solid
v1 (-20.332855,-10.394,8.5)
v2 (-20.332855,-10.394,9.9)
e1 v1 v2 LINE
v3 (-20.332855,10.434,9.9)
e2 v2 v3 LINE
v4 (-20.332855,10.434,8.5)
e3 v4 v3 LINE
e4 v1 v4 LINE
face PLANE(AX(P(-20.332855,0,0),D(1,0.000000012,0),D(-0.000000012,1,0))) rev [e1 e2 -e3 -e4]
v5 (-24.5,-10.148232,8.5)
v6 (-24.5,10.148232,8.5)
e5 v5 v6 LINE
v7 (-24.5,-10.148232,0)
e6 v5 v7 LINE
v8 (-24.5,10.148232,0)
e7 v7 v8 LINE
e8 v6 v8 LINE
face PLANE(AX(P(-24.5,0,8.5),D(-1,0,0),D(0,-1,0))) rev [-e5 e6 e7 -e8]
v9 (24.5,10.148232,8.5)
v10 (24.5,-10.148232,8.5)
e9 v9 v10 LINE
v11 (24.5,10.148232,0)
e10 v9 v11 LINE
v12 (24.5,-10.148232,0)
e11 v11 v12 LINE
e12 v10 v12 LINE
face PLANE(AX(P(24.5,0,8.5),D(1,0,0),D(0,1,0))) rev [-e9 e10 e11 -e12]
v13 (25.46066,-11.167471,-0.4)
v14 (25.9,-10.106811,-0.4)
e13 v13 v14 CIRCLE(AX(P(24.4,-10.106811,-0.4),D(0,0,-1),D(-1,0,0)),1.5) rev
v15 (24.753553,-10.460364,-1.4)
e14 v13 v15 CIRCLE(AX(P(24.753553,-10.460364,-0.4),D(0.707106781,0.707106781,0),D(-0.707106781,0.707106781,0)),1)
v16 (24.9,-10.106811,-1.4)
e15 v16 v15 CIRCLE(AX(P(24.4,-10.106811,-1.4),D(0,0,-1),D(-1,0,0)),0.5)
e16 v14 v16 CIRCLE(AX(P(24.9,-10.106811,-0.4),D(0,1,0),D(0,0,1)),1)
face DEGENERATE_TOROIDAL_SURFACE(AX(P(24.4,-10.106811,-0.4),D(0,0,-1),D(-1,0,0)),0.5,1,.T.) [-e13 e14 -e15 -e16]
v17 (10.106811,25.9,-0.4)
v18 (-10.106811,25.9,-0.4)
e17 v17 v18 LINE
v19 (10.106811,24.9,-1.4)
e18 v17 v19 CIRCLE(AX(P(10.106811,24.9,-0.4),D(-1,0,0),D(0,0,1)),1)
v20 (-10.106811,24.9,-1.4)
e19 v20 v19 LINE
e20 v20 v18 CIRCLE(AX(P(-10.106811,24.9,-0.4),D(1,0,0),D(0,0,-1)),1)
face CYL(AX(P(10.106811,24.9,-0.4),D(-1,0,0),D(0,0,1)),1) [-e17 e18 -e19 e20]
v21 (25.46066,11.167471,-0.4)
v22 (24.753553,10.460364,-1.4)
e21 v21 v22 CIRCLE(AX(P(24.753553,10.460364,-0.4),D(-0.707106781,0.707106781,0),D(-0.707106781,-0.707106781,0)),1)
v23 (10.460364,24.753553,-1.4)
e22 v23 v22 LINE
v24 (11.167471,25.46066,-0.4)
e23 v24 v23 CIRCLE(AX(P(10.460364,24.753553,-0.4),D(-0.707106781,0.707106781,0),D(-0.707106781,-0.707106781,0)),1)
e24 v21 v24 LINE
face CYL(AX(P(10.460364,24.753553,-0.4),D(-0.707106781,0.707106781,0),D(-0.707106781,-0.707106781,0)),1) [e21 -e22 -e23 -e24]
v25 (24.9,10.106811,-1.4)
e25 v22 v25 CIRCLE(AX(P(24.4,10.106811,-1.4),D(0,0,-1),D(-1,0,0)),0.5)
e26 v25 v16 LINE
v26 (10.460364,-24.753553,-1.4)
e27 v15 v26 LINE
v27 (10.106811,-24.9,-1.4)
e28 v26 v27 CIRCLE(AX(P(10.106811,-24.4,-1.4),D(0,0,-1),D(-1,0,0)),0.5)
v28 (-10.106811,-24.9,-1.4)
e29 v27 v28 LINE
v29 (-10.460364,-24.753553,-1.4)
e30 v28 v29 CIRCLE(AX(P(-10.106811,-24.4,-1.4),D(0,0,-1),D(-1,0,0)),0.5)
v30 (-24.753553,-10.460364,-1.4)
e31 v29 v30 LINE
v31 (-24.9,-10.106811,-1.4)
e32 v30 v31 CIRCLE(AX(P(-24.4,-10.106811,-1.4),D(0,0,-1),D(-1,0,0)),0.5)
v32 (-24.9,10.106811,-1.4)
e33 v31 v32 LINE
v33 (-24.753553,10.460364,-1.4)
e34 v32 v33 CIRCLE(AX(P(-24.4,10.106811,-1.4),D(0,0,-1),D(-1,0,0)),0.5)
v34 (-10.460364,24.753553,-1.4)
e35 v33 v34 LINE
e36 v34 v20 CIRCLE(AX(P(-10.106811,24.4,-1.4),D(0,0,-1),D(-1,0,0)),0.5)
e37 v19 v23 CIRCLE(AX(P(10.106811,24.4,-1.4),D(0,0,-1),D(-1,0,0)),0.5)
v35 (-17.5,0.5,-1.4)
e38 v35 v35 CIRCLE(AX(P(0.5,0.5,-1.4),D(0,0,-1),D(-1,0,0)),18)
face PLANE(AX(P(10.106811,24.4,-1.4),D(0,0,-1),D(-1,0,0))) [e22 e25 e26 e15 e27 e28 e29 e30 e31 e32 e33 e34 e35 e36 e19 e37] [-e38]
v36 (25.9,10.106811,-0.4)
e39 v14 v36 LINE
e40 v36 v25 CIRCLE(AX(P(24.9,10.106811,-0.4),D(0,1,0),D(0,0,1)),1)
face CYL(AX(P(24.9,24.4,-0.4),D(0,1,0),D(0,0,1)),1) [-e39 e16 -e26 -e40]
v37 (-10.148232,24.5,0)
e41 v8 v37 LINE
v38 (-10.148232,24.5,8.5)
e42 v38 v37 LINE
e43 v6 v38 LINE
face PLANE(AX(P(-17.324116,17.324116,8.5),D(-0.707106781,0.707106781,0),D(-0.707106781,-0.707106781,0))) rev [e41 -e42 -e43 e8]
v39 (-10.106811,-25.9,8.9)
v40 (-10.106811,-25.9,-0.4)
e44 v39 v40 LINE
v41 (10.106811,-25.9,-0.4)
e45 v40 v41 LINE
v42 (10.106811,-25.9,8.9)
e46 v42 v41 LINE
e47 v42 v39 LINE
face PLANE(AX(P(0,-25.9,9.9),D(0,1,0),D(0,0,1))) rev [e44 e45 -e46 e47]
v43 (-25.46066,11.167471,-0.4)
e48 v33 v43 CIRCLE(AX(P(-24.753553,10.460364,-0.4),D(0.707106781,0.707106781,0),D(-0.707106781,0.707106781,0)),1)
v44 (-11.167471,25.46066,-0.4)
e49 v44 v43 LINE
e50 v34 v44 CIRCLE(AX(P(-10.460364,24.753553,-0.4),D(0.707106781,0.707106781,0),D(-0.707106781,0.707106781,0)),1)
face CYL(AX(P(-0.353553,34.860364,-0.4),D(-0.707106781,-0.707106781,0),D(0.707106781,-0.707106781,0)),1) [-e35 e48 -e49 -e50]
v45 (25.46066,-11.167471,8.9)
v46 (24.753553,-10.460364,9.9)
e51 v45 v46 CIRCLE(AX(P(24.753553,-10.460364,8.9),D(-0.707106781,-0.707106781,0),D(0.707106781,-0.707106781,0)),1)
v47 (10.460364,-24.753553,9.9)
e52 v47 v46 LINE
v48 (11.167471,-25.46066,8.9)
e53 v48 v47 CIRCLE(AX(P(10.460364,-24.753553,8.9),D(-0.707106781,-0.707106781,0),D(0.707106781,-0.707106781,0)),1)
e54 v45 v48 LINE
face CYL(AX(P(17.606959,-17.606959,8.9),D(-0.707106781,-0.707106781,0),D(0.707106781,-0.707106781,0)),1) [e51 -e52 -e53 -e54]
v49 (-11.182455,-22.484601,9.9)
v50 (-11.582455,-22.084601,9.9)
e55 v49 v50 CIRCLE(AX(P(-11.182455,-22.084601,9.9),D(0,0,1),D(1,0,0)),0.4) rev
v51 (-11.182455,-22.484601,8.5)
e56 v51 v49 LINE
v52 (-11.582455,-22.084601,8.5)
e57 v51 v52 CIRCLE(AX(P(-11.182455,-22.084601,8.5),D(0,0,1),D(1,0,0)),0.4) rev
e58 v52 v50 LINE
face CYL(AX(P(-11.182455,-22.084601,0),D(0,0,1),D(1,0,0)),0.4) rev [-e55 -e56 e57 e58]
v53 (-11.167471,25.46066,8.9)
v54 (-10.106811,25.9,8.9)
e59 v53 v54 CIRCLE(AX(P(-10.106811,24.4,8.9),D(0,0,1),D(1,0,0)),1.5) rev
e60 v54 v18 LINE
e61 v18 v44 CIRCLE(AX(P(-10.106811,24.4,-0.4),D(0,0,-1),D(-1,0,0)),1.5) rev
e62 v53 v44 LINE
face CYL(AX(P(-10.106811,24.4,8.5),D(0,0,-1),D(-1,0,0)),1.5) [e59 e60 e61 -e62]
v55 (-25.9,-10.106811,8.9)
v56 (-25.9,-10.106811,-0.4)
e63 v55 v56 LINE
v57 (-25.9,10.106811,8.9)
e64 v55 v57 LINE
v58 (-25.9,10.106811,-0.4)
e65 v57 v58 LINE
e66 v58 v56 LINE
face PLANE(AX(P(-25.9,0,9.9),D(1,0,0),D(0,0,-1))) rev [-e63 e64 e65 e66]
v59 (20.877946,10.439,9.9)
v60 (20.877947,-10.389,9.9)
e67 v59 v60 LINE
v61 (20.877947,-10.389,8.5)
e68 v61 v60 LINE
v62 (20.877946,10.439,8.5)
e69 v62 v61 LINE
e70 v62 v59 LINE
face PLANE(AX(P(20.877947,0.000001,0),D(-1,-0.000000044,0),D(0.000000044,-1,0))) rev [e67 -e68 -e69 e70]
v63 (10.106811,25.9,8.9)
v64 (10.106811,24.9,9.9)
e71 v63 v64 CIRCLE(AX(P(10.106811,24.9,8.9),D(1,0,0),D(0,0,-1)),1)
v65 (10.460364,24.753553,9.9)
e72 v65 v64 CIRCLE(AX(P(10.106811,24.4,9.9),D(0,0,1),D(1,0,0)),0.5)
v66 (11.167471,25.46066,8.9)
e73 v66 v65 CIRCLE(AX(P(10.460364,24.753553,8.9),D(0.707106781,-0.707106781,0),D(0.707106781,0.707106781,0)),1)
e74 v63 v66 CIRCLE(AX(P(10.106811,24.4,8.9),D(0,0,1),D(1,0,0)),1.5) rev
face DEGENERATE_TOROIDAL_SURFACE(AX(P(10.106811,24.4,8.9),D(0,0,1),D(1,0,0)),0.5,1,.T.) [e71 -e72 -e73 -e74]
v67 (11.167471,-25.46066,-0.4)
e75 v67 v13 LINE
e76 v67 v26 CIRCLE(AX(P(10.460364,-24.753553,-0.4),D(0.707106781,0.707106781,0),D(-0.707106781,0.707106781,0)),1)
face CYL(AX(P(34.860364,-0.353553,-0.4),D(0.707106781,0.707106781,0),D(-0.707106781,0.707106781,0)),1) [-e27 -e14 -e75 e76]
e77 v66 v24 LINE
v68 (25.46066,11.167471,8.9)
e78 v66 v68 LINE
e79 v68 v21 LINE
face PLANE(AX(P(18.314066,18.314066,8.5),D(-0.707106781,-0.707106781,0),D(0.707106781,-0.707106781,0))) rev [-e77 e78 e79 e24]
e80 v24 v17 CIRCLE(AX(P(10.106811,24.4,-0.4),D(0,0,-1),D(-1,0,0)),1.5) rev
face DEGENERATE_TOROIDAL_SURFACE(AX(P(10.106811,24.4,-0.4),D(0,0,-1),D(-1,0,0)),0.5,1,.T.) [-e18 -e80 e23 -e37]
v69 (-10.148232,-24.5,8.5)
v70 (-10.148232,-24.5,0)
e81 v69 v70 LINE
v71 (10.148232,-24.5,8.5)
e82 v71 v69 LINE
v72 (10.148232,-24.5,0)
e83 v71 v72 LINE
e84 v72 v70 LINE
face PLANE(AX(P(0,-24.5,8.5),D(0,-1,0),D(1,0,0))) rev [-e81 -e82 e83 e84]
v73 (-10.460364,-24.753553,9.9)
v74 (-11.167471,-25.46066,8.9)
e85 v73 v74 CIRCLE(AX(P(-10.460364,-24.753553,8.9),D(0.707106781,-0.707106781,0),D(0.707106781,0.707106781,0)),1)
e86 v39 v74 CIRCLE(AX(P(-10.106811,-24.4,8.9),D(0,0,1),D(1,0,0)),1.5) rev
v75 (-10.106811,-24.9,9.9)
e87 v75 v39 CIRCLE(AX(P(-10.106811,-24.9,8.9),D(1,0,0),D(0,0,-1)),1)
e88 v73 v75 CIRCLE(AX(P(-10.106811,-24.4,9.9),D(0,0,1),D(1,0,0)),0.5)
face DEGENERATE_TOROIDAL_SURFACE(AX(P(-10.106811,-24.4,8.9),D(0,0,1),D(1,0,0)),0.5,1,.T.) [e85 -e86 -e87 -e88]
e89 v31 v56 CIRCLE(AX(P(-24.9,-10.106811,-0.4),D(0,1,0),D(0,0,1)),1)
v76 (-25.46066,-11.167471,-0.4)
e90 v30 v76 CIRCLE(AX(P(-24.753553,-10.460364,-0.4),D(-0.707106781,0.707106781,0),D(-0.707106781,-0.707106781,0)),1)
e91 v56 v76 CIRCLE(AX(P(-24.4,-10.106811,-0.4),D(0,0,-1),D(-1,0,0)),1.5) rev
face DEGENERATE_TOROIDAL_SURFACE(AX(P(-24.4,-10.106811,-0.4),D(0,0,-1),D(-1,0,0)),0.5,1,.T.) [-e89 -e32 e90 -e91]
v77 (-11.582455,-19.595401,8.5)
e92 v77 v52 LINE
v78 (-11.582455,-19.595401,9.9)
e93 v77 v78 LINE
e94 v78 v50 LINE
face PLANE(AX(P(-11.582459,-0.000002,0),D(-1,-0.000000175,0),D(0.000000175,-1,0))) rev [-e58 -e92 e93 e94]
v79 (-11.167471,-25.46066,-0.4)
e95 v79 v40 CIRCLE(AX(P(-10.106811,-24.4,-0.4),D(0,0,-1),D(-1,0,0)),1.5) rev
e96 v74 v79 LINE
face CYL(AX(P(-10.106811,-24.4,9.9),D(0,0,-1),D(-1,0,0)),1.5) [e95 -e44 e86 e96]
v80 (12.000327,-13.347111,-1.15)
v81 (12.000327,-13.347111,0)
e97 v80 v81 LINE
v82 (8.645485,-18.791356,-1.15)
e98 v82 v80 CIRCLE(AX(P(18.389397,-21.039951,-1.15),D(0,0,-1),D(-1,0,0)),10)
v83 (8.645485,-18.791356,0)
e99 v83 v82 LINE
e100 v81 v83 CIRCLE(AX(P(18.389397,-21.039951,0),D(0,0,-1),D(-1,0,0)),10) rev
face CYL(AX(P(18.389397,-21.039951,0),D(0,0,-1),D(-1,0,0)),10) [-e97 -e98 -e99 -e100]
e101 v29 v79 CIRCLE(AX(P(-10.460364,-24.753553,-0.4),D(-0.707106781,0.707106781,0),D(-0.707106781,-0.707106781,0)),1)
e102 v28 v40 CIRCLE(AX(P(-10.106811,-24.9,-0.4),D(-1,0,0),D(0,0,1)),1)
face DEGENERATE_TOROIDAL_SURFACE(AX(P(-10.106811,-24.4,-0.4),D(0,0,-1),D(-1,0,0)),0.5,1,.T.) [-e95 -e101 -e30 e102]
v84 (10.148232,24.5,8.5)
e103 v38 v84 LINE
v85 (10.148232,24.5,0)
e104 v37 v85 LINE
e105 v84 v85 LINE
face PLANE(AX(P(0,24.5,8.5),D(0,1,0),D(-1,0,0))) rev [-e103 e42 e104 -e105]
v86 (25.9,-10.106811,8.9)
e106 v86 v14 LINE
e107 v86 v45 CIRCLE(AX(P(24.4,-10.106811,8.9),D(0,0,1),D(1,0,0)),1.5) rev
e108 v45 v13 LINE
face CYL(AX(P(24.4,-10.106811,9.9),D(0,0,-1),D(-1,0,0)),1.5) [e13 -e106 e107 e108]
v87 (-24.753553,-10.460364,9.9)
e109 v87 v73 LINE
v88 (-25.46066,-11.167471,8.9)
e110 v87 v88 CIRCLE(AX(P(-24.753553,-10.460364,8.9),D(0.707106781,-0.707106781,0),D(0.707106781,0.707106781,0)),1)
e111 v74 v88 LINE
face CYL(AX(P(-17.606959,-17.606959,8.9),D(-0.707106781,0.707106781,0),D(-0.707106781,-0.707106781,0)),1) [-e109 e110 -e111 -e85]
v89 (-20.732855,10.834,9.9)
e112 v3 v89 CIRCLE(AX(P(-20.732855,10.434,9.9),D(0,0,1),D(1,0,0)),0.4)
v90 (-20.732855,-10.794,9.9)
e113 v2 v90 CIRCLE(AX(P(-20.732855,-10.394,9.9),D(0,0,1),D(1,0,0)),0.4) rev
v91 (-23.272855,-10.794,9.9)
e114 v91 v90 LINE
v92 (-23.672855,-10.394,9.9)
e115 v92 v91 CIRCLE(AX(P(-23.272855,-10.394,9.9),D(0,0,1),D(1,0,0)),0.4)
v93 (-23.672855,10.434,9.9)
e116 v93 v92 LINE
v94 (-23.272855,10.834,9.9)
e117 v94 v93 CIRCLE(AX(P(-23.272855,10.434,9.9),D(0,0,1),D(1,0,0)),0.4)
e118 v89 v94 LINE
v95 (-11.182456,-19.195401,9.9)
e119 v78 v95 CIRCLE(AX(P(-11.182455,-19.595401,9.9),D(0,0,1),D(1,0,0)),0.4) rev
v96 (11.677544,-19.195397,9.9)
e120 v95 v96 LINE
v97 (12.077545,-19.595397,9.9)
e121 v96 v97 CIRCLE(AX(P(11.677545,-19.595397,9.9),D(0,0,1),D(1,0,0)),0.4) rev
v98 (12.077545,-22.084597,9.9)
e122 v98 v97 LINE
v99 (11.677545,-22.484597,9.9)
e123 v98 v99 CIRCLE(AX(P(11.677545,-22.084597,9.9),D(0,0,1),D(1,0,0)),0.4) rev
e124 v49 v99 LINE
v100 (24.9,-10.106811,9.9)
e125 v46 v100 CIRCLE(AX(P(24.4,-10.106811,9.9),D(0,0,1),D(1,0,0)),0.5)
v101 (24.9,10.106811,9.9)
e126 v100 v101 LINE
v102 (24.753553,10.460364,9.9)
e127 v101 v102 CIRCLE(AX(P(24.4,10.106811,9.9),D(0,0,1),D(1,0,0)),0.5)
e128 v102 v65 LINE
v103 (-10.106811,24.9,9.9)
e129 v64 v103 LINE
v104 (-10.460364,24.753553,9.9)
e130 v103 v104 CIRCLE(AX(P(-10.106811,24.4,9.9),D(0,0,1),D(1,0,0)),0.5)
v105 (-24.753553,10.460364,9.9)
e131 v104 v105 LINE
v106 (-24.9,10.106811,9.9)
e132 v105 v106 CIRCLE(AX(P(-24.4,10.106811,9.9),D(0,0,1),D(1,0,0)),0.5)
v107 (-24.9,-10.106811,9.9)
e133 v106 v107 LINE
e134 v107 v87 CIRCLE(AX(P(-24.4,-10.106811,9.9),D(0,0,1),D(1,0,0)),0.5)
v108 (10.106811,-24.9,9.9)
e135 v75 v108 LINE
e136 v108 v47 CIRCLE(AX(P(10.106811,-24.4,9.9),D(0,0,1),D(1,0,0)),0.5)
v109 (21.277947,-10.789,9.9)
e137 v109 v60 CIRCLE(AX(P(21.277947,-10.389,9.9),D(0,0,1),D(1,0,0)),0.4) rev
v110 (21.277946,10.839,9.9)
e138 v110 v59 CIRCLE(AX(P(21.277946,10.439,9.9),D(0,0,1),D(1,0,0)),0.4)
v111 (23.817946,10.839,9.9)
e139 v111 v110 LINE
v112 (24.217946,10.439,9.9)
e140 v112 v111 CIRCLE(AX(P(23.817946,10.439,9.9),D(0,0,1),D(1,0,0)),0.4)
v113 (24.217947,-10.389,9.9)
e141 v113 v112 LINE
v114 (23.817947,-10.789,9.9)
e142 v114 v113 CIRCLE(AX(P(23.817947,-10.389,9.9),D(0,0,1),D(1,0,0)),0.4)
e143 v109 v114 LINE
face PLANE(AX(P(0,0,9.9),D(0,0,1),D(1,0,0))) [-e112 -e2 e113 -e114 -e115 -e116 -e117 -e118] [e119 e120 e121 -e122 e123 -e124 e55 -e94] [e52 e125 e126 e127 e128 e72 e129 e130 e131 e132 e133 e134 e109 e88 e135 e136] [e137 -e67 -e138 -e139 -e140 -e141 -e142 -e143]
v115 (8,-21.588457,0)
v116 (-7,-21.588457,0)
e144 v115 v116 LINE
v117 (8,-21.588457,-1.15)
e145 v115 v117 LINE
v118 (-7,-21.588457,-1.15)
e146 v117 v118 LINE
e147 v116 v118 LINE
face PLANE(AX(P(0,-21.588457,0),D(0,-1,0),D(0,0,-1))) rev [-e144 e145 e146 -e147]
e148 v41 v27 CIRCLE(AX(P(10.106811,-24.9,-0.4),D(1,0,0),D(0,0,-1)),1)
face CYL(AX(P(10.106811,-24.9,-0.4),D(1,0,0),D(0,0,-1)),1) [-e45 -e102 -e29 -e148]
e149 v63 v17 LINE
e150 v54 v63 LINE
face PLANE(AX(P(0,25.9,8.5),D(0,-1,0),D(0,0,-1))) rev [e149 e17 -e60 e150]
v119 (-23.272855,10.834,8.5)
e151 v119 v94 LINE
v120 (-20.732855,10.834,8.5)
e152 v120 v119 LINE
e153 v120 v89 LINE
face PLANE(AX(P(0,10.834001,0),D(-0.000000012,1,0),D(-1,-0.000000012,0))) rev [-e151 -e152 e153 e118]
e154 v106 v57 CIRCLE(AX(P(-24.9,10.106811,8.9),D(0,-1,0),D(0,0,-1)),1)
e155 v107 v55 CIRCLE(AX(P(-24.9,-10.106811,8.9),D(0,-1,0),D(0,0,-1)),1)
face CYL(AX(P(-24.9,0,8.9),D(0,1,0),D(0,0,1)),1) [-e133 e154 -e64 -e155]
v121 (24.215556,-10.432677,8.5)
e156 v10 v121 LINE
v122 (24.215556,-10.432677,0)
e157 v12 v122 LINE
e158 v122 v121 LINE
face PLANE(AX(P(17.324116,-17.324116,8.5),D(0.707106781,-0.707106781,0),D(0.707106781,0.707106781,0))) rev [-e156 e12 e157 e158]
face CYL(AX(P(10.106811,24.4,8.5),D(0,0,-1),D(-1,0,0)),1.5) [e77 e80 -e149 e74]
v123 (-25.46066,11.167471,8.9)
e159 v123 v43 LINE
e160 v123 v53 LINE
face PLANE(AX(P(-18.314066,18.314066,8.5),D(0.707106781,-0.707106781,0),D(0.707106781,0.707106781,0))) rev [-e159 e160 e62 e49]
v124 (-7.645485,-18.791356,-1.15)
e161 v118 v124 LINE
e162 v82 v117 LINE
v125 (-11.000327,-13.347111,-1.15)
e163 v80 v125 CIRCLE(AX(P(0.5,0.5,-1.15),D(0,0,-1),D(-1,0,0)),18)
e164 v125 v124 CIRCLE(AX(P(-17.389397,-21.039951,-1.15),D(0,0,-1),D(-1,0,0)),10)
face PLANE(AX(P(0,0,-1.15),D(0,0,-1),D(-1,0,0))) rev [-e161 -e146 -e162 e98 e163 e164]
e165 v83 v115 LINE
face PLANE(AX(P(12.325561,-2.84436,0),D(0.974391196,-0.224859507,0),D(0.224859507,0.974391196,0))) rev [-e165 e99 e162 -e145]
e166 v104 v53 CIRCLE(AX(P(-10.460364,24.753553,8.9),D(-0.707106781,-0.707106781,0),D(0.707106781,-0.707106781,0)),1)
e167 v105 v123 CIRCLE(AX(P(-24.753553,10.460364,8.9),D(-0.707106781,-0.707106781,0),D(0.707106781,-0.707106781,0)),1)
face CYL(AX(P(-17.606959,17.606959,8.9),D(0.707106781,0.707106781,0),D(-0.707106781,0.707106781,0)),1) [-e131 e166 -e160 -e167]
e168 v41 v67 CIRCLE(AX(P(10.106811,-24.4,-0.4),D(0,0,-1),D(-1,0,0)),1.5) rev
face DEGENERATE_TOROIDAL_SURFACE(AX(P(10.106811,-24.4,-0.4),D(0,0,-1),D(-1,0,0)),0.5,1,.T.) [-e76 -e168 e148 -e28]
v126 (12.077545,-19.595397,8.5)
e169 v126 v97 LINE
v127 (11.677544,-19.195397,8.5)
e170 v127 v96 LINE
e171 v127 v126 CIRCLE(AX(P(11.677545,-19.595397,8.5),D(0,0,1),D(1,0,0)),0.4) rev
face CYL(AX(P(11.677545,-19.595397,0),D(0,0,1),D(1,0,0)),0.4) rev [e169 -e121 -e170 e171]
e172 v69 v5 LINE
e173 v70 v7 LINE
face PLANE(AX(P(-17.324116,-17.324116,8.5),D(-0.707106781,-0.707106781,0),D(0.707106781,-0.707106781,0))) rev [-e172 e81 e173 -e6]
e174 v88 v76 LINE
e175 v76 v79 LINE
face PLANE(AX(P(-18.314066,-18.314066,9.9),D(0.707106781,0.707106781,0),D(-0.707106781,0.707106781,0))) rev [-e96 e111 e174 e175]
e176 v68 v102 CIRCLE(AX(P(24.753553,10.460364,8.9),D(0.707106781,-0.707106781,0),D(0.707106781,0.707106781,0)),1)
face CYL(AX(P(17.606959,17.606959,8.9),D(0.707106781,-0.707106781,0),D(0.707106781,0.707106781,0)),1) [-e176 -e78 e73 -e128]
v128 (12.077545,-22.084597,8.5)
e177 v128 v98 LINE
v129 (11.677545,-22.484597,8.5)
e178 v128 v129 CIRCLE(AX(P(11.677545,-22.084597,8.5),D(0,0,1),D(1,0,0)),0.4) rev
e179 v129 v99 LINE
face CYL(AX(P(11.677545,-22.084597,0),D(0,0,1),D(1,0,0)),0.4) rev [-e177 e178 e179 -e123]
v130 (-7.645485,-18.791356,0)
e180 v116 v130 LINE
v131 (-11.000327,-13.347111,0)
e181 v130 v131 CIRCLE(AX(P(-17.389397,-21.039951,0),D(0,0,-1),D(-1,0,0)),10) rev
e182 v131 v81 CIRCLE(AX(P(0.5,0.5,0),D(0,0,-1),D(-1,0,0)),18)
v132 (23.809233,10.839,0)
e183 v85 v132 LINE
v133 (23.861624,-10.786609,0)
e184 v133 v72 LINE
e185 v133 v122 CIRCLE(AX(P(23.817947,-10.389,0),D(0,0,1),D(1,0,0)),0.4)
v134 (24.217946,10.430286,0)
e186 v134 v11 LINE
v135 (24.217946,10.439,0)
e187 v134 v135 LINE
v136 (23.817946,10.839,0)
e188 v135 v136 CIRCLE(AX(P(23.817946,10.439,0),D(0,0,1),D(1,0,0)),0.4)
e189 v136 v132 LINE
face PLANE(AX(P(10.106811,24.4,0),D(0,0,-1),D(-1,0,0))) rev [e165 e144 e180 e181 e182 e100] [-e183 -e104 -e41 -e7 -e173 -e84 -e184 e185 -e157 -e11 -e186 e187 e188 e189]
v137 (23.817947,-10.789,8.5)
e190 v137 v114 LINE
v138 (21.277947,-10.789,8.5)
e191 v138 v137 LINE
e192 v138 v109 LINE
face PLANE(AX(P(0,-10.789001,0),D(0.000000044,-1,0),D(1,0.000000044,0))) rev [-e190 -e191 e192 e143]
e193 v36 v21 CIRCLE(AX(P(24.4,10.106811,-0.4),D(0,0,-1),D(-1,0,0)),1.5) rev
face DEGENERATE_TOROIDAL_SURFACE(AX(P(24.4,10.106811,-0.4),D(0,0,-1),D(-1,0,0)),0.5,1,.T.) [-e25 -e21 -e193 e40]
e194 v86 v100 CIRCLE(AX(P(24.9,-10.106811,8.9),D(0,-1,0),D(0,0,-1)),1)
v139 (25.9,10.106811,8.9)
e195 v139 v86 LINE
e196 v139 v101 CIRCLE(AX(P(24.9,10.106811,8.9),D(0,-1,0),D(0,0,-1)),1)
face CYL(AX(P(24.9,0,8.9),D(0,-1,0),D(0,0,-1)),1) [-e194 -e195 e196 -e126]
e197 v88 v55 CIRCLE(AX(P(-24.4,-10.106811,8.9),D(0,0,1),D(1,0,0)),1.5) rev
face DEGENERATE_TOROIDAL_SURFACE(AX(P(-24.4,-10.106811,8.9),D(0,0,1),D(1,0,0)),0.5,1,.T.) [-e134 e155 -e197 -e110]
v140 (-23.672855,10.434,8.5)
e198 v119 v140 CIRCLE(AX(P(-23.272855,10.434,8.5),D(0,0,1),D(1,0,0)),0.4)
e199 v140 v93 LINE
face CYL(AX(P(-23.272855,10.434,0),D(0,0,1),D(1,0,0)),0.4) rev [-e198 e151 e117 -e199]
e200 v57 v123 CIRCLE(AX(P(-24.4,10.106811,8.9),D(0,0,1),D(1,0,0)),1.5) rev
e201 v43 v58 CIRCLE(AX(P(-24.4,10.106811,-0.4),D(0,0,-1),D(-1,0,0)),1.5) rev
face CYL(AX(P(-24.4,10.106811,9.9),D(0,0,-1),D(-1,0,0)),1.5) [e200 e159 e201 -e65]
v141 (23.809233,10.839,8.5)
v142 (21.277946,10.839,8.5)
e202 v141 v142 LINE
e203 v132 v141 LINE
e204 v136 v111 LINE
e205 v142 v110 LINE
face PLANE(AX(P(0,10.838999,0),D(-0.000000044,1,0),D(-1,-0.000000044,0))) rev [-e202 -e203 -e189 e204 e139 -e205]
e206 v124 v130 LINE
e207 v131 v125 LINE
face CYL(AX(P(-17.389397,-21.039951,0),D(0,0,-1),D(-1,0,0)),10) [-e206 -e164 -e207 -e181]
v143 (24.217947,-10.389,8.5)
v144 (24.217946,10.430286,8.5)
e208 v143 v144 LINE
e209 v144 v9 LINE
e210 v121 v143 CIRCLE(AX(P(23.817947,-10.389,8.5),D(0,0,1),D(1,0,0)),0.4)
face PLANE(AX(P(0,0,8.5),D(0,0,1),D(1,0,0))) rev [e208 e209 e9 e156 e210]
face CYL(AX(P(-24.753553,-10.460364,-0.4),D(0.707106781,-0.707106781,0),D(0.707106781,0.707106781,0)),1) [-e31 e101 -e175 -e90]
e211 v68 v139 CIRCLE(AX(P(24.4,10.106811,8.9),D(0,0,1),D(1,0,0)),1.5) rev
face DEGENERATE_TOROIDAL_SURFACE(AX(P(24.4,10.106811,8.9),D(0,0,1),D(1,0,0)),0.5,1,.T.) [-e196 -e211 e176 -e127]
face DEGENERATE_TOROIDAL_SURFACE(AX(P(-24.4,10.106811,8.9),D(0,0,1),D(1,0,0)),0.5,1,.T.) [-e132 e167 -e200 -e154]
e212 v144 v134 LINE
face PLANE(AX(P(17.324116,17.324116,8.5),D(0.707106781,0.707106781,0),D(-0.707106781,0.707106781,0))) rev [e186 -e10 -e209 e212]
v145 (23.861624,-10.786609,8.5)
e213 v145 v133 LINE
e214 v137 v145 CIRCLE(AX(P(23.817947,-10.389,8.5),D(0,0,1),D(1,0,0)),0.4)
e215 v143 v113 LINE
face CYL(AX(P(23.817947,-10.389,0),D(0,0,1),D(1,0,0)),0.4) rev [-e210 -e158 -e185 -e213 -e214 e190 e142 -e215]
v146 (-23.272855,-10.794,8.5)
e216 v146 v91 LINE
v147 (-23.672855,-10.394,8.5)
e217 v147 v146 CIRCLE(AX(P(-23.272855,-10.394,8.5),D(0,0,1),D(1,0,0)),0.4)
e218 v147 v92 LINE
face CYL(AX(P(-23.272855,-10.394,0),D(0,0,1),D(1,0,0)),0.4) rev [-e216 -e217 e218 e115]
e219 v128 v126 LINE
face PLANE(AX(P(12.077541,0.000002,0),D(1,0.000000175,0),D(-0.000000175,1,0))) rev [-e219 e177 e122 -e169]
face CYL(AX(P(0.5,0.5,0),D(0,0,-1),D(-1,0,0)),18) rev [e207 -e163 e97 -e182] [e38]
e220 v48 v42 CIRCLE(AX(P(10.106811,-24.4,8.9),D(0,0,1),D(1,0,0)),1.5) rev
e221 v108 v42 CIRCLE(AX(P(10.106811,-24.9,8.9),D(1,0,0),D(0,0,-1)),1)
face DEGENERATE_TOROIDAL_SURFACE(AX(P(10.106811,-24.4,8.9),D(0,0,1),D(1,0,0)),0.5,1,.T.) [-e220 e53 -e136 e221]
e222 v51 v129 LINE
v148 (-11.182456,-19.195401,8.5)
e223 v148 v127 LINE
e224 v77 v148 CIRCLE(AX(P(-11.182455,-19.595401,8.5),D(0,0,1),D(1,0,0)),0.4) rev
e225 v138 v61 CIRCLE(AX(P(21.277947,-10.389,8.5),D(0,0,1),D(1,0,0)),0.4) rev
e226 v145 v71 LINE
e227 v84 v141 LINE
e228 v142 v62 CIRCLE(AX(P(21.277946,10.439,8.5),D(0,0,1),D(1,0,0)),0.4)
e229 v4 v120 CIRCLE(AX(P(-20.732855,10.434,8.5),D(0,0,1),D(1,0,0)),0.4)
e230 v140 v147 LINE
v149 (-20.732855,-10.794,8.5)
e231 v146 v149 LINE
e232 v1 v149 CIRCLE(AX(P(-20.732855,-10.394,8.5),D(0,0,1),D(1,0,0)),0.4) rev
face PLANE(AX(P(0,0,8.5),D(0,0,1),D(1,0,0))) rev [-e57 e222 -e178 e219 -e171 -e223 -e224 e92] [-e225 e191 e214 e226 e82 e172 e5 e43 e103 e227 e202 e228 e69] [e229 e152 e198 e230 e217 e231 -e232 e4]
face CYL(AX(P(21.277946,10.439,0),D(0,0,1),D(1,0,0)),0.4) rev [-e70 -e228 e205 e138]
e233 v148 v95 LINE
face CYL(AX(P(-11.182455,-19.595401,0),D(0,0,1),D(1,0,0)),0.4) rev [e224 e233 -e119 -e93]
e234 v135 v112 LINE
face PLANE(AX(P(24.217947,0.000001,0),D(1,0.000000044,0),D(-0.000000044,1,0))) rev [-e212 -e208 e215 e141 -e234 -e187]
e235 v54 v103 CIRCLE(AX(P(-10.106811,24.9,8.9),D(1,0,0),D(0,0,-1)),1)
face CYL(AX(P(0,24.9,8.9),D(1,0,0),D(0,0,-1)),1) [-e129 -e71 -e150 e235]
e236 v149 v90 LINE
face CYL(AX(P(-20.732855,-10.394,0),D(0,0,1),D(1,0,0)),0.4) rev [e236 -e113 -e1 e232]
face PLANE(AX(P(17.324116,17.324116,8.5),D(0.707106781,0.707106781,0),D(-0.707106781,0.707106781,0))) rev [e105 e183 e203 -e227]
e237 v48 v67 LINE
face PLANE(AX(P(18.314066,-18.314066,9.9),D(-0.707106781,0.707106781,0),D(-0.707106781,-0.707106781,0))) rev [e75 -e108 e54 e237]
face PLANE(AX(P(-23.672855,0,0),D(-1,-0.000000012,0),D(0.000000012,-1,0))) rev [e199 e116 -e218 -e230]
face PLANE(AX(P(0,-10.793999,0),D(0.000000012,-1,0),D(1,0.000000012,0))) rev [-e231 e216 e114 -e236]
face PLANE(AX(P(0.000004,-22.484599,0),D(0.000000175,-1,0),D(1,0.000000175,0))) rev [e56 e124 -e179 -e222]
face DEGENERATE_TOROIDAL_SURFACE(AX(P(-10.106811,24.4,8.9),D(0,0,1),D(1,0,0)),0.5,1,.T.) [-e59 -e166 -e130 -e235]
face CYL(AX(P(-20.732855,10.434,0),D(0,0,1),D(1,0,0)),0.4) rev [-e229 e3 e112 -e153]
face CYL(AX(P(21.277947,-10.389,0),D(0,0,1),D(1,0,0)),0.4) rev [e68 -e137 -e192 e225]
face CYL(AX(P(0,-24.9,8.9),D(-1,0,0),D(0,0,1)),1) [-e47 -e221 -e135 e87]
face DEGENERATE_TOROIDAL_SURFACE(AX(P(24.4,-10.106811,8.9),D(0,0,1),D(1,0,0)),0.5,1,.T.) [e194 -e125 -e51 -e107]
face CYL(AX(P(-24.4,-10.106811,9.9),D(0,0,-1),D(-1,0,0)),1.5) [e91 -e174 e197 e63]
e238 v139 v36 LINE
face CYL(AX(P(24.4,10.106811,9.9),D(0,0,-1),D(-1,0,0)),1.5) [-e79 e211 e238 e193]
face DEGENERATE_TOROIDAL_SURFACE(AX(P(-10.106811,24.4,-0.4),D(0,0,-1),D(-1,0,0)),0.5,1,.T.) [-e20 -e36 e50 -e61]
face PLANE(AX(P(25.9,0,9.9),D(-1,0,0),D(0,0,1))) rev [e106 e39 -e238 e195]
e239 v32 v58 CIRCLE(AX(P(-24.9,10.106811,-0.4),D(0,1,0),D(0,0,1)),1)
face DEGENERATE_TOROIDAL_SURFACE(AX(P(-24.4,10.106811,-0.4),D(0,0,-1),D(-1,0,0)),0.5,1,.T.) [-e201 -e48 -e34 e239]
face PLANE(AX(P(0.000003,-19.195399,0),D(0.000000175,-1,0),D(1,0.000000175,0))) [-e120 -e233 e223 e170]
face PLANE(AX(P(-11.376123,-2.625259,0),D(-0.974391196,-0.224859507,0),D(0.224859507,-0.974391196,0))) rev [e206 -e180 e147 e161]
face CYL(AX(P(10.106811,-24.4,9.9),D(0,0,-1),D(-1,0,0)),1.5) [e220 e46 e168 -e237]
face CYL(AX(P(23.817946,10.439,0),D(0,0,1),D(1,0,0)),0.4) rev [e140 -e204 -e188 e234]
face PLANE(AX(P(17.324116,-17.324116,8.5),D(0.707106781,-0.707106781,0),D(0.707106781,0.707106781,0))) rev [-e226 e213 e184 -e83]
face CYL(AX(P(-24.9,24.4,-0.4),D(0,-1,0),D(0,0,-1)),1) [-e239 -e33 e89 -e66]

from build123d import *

# Parameters (mm, degrees)
BOSS_EXTRUDE1_DEPTH   = 8.5
BOSS_EXTRUDE1_2_DEPTH = 8.5
BOSS_EXTRUDE1_3_DEPTH = 8.5
BOSS_EXTRUDE1_4_DEPTH = 8.5
BOSS_EXTRUDE2_DEPTH   = 1.4
BOSS_EXTRUDE3_DEPTH   = 8.5
BOSS_EXTRUDE5_DEPTH   = 1
CUT_EXTRUDE1_DEPTH    = 38.942456431
CUT_EXTRUDE2_DEPTH    = 38.942456431
FILLET1_R             = 1
BOSS_EXTRUDE6_START   = 1.4
BOSS_EXTRUDE6_DEPTH   = 1.4
FILLET2_R             = 1
CUT_EXTRUDE3_DEPTH    = 1.4
BOSS_EXTRUDE7_DEPTH   = 0.25
FILLET3_R             = 10


with BuildPart() as part:
    # Sketch1 → Boss-Extrude1 (new body)
    with BuildSketch(Plane.XY):
        with BuildLine():
            Line((25.9, -10.106810922), (25.9, 10.106810922))
            ThreePointArc((25.9, 10.106810922), (25.785819299, 10.68083607), (25.460660172, 11.167471094))
            Line((25.460660172, 11.167471094), (22.50588745, 14.122243815))
            Line((22.50588745, 14.122243815), (21.515937957, 13.132294321))
            Line((21.515937957, 13.132294321), (24.5, 10.148232278))
            Line((24.5, 10.148232278), (24.5, -10.148232278))
            Line((24.5, -10.148232278), (21.692714652, -12.955517626))
            Line((21.692714652, -12.955517626), (22.682664146, -13.94546712))
            Line((22.682664146, -13.94546712), (25.460660172, -11.167471094))
            ThreePointArc((25.460660172, -11.167471094), (25.785819299, -10.68083607), (25.9, -10.106810922))
        make_face()
    extrude(amount=BOSS_EXTRUDE1_DEPTH)



with BuildPart() as body_2:
    # Sketch1 → Boss-Extrude1 2 (new body)
    with BuildSketch(Plane.XY):
        with BuildLine():
            Line((-16.177281759, -20.450849507), (-11.167471094, -25.460660172))
            ThreePointArc((-11.167471094, -25.460660172), (-10.68083607, -25.785819299), (-10.106810922, -25.9))
            Line((-10.106810922, -25.9), (10.106810922, -25.9))
            ThreePointArc((10.106810922, -25.9), (10.68083607, -25.785819299), (11.167471094, -25.460660172))
            Line((11.167471094, -25.460660172), (15.611596334, -21.016534932))
            Line((15.611596334, -21.016534932), (14.62164684, -20.026585438))
            Line((14.62164684, -20.026585438), (10.148232278, -24.5))
            Line((10.148232278, -24.5), (-10.148232278, -24.5))
            Line((-10.148232278, -24.5), (-15.187332265, -19.460900013))
            Line((-15.187332265, -19.460900013), (-16.177281759, -20.450849507))
        make_face()
    extrude(amount=BOSS_EXTRUDE1_2_DEPTH)


with BuildPart() as body_3:
    # Sketch1 → Boss-Extrude1 3 (new body)
    with BuildSketch(Plane.XY):
        with BuildLine():
            Line((-22.116978721, 14.511152545), (-25.460660172, 11.167471094))
            ThreePointArc((-25.460660172, 11.167471094), (-25.785819299, 10.68083607), (-25.9, 10.106810922))
            Line((-25.9, 10.106810922), (-25.9, -10.106810922))
            ThreePointArc((-25.9, -10.106810922), (-25.785819299, -10.68083607), (-25.460660172, -11.167471094))
            Line((-25.460660172, -11.167471094), (-22.187689399, -14.440441867))
            Line((-22.187689399, -14.440441867), (-21.197739905, -13.450492373))
            Line((-21.197739905, -13.450492373), (-24.5, -10.148232278))
            Line((-24.5, -10.148232278), (-24.5, 10.148232278))
            Line((-24.5, 10.148232278), (-21.127029227, 13.521203051))
            Line((-21.127029227, 13.521203051), (-22.116978721, 14.511152545))
        make_face()
    extrude(amount=BOSS_EXTRUDE1_3_DEPTH)


with BuildPart() as body_4:
    # Sketch1 → Boss-Extrude1 4 (new body)
    with BuildSketch(Plane.XY):
        with BuildLine():
            Line((10.106810922, 25.9), (-10.106810922, 25.9))
            ThreePointArc((-10.106810922, 25.9), (-10.68083607, 25.785819299), (-11.167471094, 25.460660172))
            Line((-11.167471094, 25.460660172), (-17.520784643, 19.107346623))
            Line((-17.520784643, 19.107346623), (-16.530835149, 18.117397129))
            Line((-16.530835149, 18.117397129), (-10.148232278, 24.5))
            Line((-10.148232278, 24.5), (10.148232278, 24.5))
            Line((10.148232278, 24.5), (16.919743879, 17.728488399))
            Line((16.919743879, 17.728488399), (17.909693373, 18.718437893))
            Line((17.909693373, 18.718437893), (11.167471094, 25.460660172))
            ThreePointArc((11.167471094, 25.460660172), (10.68083607, 25.785819299), (10.106810922, 25.9))
        make_face()
    extrude(amount=BOSS_EXTRUDE1_4_DEPTH)


with BuildPart() as part_1:
    add(part.part)

    add(body_2.part)  # Boss-Extrude2 merges body 2

    add(body_3.part)  # Boss-Extrude2 merges body 3

    add(body_4.part)  # Boss-Extrude2 merges body 4
    # Sketch2 → Boss-Extrude2 (add)
    with BuildSketch(Plane.XY.offset(8.5)):
        with BuildLine():
            ThreePointArc((25.460660172, -11.167471094), (25.785819299, -10.68083607), (25.9, -10.106810922))
            Line((25.9, -10.106810922), (25.9, 10.106810922))
            ThreePointArc((25.9, 10.106810922), (25.785819299, 10.68083607), (25.460660172, 11.167471094))
            Line((25.460660172, 11.167471094), (11.167471094, 25.460660172))
            ThreePointArc((11.167471094, 25.460660172), (10.68083607, 25.785819299), (10.106810922, 25.9))
            Line((10.106810922, 25.9), (-10.106810922, 25.9))
            ThreePointArc((-10.106810922, 25.9), (-10.68083607, 25.785819299), (-11.167471094, 25.460660172))
            Line((-11.167471094, 25.460660172), (-25.460660172, 11.167471094))
            ThreePointArc((-25.460660172, 11.167471094), (-25.785819299, 10.68083607), (-25.9, 10.106810922))
            Line((-25.9, 10.106810922), (-25.9, -10.106810922))
            ThreePointArc((-25.9, -10.106810922), (-25.785819299, -10.68083607), (-25.460660172, -11.167471094))
            Line((-25.460660172, -11.167471094), (-11.167471094, -25.460660172))
            ThreePointArc((-11.167471094, -25.460660172), (-10.68083607, -25.785819299), (-10.106810922, -25.9))
            Line((-10.106810922, -25.9), (10.106810922, -25.9))
            ThreePointArc((10.106810922, -25.9), (10.68083607, -25.785819299), (11.167471094, -25.460660172))
            Line((11.167471094, -25.460660172), (25.460660172, -11.167471094))
        make_face()
    extrude(amount=BOSS_EXTRUDE2_DEPTH)

    # Sketch3 → Boss-Extrude3 (add)
    with BuildSketch(Plane(origin=(0, 0, 8.5), x_dir=(-1, 0, 0), z_dir=(0, 0, -1))):
        Polygon((-21.515937957, 13.132294321), (-16.919743879, 17.728488399), (-17.909693373, 18.718437893), (-22.50588745, 14.122243815), align=None)
        Polygon((21.127029227, 13.521203051), (16.530835149, 18.117397129), (17.520784643, 19.107346623), (22.116978721, 14.511152545), align=None)
        Polygon((-21.692714652, -12.955517626), (-22.682664146, -13.94546712), (-15.611596334, -21.016534932), (-14.62164684, -20.026585438), align=None)
        Polygon((15.187332265, -19.460900013), (16.177281759, -20.450849507), (22.187689399, -14.440441867), (21.197739905, -13.450492373), align=None)
    extrude(amount=BOSS_EXTRUDE3_DEPTH)

    # Sketch5 → Boss-Extrude5 (add)
    with BuildSketch(Plane(origin=(0, 0, 8.5), x_dir=(-1, 0, 0), z_dir=(0, 0, -1))):
        Polygon((16.177281759, -20.450849507), (22.187689399, -14.440441867), (21.197739905, -13.450492373), (15.187332265, -19.460900013), align=None)
    extrude(amount=BOSS_EXTRUDE5_DEPTH)

    # Sketch6 → Cut-Extrude1 (cut, through all)
    with BuildSketch(Plane.XY.offset(9.9)):
        with BuildLine():
            Line((-20.332854575, -10.39399953), (-20.332854823, 10.43400047))
            ThreePointArc((-20.332854823, 10.43400047), (-20.450012114, 10.716843181), (-20.732854828, 10.834000465))
            Line((-20.732854828, 10.834000465), (-23.272854828, 10.834000435))
            ThreePointArc((-23.272854828, 10.834000435), (-23.555697539, 10.716843144), (-23.672854823, 10.43400043))
            Line((-23.672854823, 10.43400043), (-23.672854575, -10.39399957))
            ThreePointArc((-23.672854575, -10.39399957), (-23.555697284, -10.676842281), (-23.27285457, -10.793999565))
            Line((-23.27285457, -10.793999565), (-20.73285457, -10.793999535))
            ThreePointArc((-20.73285457, -10.793999535), (-20.450011859, -10.676842244), (-20.332854575, -10.39399953))
        make_face()
        with BuildLine():
            Line((21.277947318, -10.789000444), (23.817947318, -10.789000333))
            ThreePointArc((23.817947318, -10.789000333), (24.100790025, -10.671843033), (24.217947301, -10.389000316))
            Line((24.217947301, -10.389000316), (24.21794639, 10.438999684))
            ThreePointArc((24.21794639, 10.438999684), (24.10078909, 10.721842391), (23.817946373, 10.838999667))
            Line((23.817946373, 10.838999667), (21.277946373, 10.838999556))
            ThreePointArc((21.277946373, 10.838999556), (20.995103665, 10.721842256), (20.87794639, 10.438999538))
            Line((20.87794639, 10.438999538), (20.877947301, -10.389000462))
            ThreePointArc((20.877947301, -10.389000462), (20.995104601, -10.671843169), (21.277947318, -10.789000444))
        make_face()
    extrude(amount=-CUT_EXTRUDE1_DEPTH, mode=Mode.SUBTRACT)

    # Sketch7 → Cut-Extrude2 (cut, through all)
    # profile 1 of 2: a face of its own
    with BuildSketch(Plane.XY.offset(9.9)):
        with BuildLine():
            ThreePointArc((-11.582455432, -19.595401386), (-11.465298194, -19.312558653), (-11.182455502, -19.195401316))
            Line((-11.182455502, -19.195401316), (11.677544498, -19.195397319))
            ThreePointArc((11.677544498, -19.195397319), (11.960387231, -19.312554557), (12.077544568, -19.595397249))
            Line((12.077544568, -19.595397249), (12.077545003, -22.084597249))
            ThreePointArc((12.077545003, -22.084597249), (11.960387765, -22.367439982), (11.677545073, -22.484597319))
            Line((11.677545073, -22.484597319), (9.391545073, -22.484597719))
            Line((9.391545073, -22.484597719), (-8.896454927, -22.484600916))
            Line((-8.896454927, -22.484600916), (-11.182454927, -22.484601316))
            ThreePointArc((-11.182454927, -22.484601316), (-11.46529766, -22.367444078), (-11.582454997, -22.084601386))
            Line((-11.582454997, -22.084601386), (-11.582455432, -19.595401386))
        make_face()
        Polygon((9.391545003, -22.084597719), (11.677545003, -22.084597319), (11.677544568, -19.595397319), (-11.182455432, -19.595401316), (-11.182454997, -22.084601316), (-8.896454997, -22.084600916), align=None, mode=Mode.SUBTRACT)
    # profile 2 of 2: a face of its own
    with BuildSketch(Plane.XY.offset(9.9)):
        Polygon((9.391545003, -22.084597719), (-8.896454997, -22.084600916), (-11.182454997, -22.084601316), (-11.182455432, -19.595401316), (11.677544568, -19.595397319), (11.677545003, -22.084597319), align=None)
    extrude(amount=-CUT_EXTRUDE2_DEPTH, mode=Mode.SUBTRACT)

    # Fillet1
    fillet1_edges = [part_1.edges().sort_by_distance(p)[0] for p in [
        (18.314065633, 18.314065633, 9.9),
        (10.68083607, 25.785819299, 9.9),
        (0, 25.9, 9.9),
        (-10.68083607, 25.785819299, 9.9),
        (-18.314065633, 18.314065633, 9.9),
        (-25.785819299, 10.68083607, 9.9),
        (-25.9, 0, 9.9),
        (-25.785819299, -10.68083607, 9.9),
        (-18.314065633, -18.314065633, 9.9),
        (-10.68083607, -25.785819299, 9.9),
        (0, -25.9, 9.9),
        (10.68083607, -25.785819299, 9.9),
        (18.314065633, -18.314065633, 9.9),
        (25.785819299, -10.68083607, 9.9),
        (25.9, 0, 9.9),
        (25.785819299, 10.68083607, 9.9),
    ]]
    fillet(fillet1_edges, radius=FILLET1_R)

    # Sketch8 → Boss-Extrude6 (add)
    with BuildSketch(Plane(origin=(0, 0, 0), x_dir=(-1, 0, 0), z_dir=(0, 0, -1)).offset(BOSS_EXTRUDE6_START)):
        with BuildLine():
            Line((-11.167471094, 25.460660172), (-25.460660172, 11.167471094))
            ThreePointArc((-25.460660172, 11.167471094), (-25.785819299, 10.68083607), (-25.9, 10.106810922))
            Line((-25.9, 10.106810922), (-25.9, -10.106810922))
            ThreePointArc((-25.9, -10.106810922), (-25.785819299, -10.68083607), (-25.460660172, -11.167471094))
            Line((-25.460660172, -11.167471094), (-11.167471094, -25.460660172))
            ThreePointArc((-11.167471094, -25.460660172), (-10.68083607, -25.785819299), (-10.106810922, -25.9))
            Line((-10.106810922, -25.9), (10.106810922, -25.9))
            ThreePointArc((10.106810922, -25.9), (10.68083607, -25.785819299), (11.167471094, -25.460660172))
            Line((11.167471094, -25.460660172), (25.460660172, -11.167471094))
            ThreePointArc((25.460660172, -11.167471094), (25.785819299, -10.68083607), (25.9, -10.106810922))
            Line((25.9, -10.106810922), (25.9, 10.106810922))
            ThreePointArc((25.9, 10.106810922), (25.785819299, 10.68083607), (25.460660172, 11.167471094))
            Line((25.460660172, 11.167471094), (11.167471094, 25.460660172))
            ThreePointArc((11.167471094, 25.460660172), (10.68083607, 25.785819299), (10.106810922, 25.9))
            Line((10.106810922, 25.9), (-10.106810922, 25.9))
            ThreePointArc((-10.106810922, 25.9), (-10.68083607, 25.785819299), (-11.167471094, 25.460660172))
        make_face()
    extrude(amount=-BOSS_EXTRUDE6_DEPTH)

    # Fillet2
    fillet2_edges = [part_1.edges().sort_by_distance(p)[0] for p in [
        (10.68083607, 25.785819299, -1.4),
        (18.314065633, 18.314065633, -1.4),
        (25.785819299, 10.68083607, -1.4),
        (25.9, 0, -1.4),
        (25.785819299, -10.68083607, -1.4),
        (18.314065633, -18.314065633, -1.4),
        (10.68083607, -25.785819299, -1.4),
        (0, -25.9, -1.4),
        (-10.68083607, -25.785819299, -1.4),
        (-18.314065633, -18.314065633, -1.4),
        (-25.785819299, -10.68083607, -1.4),
        (-25.9, 0, -1.4),
        (-25.785819299, 10.68083607, -1.4),
        (-18.314065633, 18.314065633, -1.4),
        (-10.68083607, 25.785819299, -1.4),
        (0, 25.9, -1.4),
    ]]
    fillet(fillet2_edges, radius=FILLET2_R)

    # Sketch9 → Cut-Extrude3 (cut)
    with BuildSketch(Plane(origin=(0, 0, -1.4), x_dir=(-1, 0, 0), z_dir=(0, 0, -1))):
        with BuildLine():
            ThreePointArc((17.5, 0.5), (-9.5, 16.088457268), (-9.5, -15.088457268))
            Line((-9.5, -15.088457268), (8.5, -15.088457268))
            ThreePointArc((8.5, -15.088457268), (15.088457268, -8.5), (17.5, 0.5))
        make_face()
        with BuildLine():
            Line((8.5, -15.088457268), (-9.5, -15.088457268))
            ThreePointArc((-9.5, -15.088457268), (-0.5, -17.5), (8.5, -15.088457268))
        make_face()
        with BuildLine():
            ThreePointArc((8.5, -15.088457268), (-0.5, -17.5), (-9.5, -15.088457268))
            Line((-9.5, -15.088457268), (-8, -21.588457268))
            Line((-8, -21.588457268), (7, -21.588457268))
            Line((7, -21.588457268), (8.5, -15.088457268))
        make_face()
    extrude(amount=-CUT_EXTRUDE3_DEPTH, mode=Mode.SUBTRACT)

    # Sketch9<3> → Boss-Extrude7 (add)
    with BuildSketch(Plane(origin=(0, 0, -1.4), x_dir=(-1, 0, 0), z_dir=(0, 0, -1))):
        with BuildLine():
            ThreePointArc((8.5, -15.088457268), (-0.5, -17.5), (-9.5, -15.088457268))
            Line((-9.5, -15.088457268), (-8, -21.588457268))
            Line((-8, -21.588457268), (7, -21.588457268))
            Line((7, -21.588457268), (8.5, -15.088457268))
        make_face()
    extrude(amount=-BOSS_EXTRUDE7_DEPTH)

    # Fillet3
    # the kernel refuses this fillet: 10 mm, written as the material it takes off along each edge
    with BuildSketch(Plane(origin=(9.5, -15.088457268, -1.15), x_dir=(0.8205991500669837, 0.5715041862570599, 0), z_dir=(0, 0, 1))) as fillet3_piece_1_section:
        with BuildLine():
            CenterArc((3.893328157, -9.964118034), FILLET3_R, 94.85518398, 37.295015249)
            Line((-2.817436219, -2.550236359), (0, 0))
            ThreePointArc((0, 0), (1.523476235, -0.064587539), (3.046952471, 0))
        make_face()
    fillet3_piece_1 = extrude(amount=10.650543516, mode=Mode.PRIVATE)
    fillet3_piece_1 = split(fillet3_piece_1, bisect_by=Plane(origin=(9.843769385, -15.549562691, 8.5), z_dir=(0, 0, -1)), keep=Keep.TOP, mode=Mode.PRIVATE)
    add(fillet3_piece_1, mode=Mode.SUBTRACT)
    with BuildSketch(Plane(origin=(-8.5, -15.088457268, -1.15), x_dir=(-0.8205991500669784, 0.5715041862570673, 0), z_dir=(0, 0, 1))) as fillet3_piece_2_section:
        with BuildLine():
            CenterArc((3.893328157, 9.964118034), FILLET3_R, 227.849800771, 37.295015249)
            Line((-2.817436219, 2.550236359), (0, 0))
            ThreePointArc((0, 0), (1.523476235, 0.064587539), (3.046952471, 0))
        make_face()
    fillet3_piece_2 = extrude(amount=10.650543516, mode=Mode.PRIVATE)
    fillet3_piece_2 = split(fillet3_piece_2, bisect_by=Plane(origin=(-8.843769385, -15.549562691, 8.5), z_dir=(0, 0, -1)), keep=Keep.TOP, mode=Mode.PRIVATE)
    add(fillet3_piece_2, mode=Mode.SUBTRACT)


solid = part_1.part
